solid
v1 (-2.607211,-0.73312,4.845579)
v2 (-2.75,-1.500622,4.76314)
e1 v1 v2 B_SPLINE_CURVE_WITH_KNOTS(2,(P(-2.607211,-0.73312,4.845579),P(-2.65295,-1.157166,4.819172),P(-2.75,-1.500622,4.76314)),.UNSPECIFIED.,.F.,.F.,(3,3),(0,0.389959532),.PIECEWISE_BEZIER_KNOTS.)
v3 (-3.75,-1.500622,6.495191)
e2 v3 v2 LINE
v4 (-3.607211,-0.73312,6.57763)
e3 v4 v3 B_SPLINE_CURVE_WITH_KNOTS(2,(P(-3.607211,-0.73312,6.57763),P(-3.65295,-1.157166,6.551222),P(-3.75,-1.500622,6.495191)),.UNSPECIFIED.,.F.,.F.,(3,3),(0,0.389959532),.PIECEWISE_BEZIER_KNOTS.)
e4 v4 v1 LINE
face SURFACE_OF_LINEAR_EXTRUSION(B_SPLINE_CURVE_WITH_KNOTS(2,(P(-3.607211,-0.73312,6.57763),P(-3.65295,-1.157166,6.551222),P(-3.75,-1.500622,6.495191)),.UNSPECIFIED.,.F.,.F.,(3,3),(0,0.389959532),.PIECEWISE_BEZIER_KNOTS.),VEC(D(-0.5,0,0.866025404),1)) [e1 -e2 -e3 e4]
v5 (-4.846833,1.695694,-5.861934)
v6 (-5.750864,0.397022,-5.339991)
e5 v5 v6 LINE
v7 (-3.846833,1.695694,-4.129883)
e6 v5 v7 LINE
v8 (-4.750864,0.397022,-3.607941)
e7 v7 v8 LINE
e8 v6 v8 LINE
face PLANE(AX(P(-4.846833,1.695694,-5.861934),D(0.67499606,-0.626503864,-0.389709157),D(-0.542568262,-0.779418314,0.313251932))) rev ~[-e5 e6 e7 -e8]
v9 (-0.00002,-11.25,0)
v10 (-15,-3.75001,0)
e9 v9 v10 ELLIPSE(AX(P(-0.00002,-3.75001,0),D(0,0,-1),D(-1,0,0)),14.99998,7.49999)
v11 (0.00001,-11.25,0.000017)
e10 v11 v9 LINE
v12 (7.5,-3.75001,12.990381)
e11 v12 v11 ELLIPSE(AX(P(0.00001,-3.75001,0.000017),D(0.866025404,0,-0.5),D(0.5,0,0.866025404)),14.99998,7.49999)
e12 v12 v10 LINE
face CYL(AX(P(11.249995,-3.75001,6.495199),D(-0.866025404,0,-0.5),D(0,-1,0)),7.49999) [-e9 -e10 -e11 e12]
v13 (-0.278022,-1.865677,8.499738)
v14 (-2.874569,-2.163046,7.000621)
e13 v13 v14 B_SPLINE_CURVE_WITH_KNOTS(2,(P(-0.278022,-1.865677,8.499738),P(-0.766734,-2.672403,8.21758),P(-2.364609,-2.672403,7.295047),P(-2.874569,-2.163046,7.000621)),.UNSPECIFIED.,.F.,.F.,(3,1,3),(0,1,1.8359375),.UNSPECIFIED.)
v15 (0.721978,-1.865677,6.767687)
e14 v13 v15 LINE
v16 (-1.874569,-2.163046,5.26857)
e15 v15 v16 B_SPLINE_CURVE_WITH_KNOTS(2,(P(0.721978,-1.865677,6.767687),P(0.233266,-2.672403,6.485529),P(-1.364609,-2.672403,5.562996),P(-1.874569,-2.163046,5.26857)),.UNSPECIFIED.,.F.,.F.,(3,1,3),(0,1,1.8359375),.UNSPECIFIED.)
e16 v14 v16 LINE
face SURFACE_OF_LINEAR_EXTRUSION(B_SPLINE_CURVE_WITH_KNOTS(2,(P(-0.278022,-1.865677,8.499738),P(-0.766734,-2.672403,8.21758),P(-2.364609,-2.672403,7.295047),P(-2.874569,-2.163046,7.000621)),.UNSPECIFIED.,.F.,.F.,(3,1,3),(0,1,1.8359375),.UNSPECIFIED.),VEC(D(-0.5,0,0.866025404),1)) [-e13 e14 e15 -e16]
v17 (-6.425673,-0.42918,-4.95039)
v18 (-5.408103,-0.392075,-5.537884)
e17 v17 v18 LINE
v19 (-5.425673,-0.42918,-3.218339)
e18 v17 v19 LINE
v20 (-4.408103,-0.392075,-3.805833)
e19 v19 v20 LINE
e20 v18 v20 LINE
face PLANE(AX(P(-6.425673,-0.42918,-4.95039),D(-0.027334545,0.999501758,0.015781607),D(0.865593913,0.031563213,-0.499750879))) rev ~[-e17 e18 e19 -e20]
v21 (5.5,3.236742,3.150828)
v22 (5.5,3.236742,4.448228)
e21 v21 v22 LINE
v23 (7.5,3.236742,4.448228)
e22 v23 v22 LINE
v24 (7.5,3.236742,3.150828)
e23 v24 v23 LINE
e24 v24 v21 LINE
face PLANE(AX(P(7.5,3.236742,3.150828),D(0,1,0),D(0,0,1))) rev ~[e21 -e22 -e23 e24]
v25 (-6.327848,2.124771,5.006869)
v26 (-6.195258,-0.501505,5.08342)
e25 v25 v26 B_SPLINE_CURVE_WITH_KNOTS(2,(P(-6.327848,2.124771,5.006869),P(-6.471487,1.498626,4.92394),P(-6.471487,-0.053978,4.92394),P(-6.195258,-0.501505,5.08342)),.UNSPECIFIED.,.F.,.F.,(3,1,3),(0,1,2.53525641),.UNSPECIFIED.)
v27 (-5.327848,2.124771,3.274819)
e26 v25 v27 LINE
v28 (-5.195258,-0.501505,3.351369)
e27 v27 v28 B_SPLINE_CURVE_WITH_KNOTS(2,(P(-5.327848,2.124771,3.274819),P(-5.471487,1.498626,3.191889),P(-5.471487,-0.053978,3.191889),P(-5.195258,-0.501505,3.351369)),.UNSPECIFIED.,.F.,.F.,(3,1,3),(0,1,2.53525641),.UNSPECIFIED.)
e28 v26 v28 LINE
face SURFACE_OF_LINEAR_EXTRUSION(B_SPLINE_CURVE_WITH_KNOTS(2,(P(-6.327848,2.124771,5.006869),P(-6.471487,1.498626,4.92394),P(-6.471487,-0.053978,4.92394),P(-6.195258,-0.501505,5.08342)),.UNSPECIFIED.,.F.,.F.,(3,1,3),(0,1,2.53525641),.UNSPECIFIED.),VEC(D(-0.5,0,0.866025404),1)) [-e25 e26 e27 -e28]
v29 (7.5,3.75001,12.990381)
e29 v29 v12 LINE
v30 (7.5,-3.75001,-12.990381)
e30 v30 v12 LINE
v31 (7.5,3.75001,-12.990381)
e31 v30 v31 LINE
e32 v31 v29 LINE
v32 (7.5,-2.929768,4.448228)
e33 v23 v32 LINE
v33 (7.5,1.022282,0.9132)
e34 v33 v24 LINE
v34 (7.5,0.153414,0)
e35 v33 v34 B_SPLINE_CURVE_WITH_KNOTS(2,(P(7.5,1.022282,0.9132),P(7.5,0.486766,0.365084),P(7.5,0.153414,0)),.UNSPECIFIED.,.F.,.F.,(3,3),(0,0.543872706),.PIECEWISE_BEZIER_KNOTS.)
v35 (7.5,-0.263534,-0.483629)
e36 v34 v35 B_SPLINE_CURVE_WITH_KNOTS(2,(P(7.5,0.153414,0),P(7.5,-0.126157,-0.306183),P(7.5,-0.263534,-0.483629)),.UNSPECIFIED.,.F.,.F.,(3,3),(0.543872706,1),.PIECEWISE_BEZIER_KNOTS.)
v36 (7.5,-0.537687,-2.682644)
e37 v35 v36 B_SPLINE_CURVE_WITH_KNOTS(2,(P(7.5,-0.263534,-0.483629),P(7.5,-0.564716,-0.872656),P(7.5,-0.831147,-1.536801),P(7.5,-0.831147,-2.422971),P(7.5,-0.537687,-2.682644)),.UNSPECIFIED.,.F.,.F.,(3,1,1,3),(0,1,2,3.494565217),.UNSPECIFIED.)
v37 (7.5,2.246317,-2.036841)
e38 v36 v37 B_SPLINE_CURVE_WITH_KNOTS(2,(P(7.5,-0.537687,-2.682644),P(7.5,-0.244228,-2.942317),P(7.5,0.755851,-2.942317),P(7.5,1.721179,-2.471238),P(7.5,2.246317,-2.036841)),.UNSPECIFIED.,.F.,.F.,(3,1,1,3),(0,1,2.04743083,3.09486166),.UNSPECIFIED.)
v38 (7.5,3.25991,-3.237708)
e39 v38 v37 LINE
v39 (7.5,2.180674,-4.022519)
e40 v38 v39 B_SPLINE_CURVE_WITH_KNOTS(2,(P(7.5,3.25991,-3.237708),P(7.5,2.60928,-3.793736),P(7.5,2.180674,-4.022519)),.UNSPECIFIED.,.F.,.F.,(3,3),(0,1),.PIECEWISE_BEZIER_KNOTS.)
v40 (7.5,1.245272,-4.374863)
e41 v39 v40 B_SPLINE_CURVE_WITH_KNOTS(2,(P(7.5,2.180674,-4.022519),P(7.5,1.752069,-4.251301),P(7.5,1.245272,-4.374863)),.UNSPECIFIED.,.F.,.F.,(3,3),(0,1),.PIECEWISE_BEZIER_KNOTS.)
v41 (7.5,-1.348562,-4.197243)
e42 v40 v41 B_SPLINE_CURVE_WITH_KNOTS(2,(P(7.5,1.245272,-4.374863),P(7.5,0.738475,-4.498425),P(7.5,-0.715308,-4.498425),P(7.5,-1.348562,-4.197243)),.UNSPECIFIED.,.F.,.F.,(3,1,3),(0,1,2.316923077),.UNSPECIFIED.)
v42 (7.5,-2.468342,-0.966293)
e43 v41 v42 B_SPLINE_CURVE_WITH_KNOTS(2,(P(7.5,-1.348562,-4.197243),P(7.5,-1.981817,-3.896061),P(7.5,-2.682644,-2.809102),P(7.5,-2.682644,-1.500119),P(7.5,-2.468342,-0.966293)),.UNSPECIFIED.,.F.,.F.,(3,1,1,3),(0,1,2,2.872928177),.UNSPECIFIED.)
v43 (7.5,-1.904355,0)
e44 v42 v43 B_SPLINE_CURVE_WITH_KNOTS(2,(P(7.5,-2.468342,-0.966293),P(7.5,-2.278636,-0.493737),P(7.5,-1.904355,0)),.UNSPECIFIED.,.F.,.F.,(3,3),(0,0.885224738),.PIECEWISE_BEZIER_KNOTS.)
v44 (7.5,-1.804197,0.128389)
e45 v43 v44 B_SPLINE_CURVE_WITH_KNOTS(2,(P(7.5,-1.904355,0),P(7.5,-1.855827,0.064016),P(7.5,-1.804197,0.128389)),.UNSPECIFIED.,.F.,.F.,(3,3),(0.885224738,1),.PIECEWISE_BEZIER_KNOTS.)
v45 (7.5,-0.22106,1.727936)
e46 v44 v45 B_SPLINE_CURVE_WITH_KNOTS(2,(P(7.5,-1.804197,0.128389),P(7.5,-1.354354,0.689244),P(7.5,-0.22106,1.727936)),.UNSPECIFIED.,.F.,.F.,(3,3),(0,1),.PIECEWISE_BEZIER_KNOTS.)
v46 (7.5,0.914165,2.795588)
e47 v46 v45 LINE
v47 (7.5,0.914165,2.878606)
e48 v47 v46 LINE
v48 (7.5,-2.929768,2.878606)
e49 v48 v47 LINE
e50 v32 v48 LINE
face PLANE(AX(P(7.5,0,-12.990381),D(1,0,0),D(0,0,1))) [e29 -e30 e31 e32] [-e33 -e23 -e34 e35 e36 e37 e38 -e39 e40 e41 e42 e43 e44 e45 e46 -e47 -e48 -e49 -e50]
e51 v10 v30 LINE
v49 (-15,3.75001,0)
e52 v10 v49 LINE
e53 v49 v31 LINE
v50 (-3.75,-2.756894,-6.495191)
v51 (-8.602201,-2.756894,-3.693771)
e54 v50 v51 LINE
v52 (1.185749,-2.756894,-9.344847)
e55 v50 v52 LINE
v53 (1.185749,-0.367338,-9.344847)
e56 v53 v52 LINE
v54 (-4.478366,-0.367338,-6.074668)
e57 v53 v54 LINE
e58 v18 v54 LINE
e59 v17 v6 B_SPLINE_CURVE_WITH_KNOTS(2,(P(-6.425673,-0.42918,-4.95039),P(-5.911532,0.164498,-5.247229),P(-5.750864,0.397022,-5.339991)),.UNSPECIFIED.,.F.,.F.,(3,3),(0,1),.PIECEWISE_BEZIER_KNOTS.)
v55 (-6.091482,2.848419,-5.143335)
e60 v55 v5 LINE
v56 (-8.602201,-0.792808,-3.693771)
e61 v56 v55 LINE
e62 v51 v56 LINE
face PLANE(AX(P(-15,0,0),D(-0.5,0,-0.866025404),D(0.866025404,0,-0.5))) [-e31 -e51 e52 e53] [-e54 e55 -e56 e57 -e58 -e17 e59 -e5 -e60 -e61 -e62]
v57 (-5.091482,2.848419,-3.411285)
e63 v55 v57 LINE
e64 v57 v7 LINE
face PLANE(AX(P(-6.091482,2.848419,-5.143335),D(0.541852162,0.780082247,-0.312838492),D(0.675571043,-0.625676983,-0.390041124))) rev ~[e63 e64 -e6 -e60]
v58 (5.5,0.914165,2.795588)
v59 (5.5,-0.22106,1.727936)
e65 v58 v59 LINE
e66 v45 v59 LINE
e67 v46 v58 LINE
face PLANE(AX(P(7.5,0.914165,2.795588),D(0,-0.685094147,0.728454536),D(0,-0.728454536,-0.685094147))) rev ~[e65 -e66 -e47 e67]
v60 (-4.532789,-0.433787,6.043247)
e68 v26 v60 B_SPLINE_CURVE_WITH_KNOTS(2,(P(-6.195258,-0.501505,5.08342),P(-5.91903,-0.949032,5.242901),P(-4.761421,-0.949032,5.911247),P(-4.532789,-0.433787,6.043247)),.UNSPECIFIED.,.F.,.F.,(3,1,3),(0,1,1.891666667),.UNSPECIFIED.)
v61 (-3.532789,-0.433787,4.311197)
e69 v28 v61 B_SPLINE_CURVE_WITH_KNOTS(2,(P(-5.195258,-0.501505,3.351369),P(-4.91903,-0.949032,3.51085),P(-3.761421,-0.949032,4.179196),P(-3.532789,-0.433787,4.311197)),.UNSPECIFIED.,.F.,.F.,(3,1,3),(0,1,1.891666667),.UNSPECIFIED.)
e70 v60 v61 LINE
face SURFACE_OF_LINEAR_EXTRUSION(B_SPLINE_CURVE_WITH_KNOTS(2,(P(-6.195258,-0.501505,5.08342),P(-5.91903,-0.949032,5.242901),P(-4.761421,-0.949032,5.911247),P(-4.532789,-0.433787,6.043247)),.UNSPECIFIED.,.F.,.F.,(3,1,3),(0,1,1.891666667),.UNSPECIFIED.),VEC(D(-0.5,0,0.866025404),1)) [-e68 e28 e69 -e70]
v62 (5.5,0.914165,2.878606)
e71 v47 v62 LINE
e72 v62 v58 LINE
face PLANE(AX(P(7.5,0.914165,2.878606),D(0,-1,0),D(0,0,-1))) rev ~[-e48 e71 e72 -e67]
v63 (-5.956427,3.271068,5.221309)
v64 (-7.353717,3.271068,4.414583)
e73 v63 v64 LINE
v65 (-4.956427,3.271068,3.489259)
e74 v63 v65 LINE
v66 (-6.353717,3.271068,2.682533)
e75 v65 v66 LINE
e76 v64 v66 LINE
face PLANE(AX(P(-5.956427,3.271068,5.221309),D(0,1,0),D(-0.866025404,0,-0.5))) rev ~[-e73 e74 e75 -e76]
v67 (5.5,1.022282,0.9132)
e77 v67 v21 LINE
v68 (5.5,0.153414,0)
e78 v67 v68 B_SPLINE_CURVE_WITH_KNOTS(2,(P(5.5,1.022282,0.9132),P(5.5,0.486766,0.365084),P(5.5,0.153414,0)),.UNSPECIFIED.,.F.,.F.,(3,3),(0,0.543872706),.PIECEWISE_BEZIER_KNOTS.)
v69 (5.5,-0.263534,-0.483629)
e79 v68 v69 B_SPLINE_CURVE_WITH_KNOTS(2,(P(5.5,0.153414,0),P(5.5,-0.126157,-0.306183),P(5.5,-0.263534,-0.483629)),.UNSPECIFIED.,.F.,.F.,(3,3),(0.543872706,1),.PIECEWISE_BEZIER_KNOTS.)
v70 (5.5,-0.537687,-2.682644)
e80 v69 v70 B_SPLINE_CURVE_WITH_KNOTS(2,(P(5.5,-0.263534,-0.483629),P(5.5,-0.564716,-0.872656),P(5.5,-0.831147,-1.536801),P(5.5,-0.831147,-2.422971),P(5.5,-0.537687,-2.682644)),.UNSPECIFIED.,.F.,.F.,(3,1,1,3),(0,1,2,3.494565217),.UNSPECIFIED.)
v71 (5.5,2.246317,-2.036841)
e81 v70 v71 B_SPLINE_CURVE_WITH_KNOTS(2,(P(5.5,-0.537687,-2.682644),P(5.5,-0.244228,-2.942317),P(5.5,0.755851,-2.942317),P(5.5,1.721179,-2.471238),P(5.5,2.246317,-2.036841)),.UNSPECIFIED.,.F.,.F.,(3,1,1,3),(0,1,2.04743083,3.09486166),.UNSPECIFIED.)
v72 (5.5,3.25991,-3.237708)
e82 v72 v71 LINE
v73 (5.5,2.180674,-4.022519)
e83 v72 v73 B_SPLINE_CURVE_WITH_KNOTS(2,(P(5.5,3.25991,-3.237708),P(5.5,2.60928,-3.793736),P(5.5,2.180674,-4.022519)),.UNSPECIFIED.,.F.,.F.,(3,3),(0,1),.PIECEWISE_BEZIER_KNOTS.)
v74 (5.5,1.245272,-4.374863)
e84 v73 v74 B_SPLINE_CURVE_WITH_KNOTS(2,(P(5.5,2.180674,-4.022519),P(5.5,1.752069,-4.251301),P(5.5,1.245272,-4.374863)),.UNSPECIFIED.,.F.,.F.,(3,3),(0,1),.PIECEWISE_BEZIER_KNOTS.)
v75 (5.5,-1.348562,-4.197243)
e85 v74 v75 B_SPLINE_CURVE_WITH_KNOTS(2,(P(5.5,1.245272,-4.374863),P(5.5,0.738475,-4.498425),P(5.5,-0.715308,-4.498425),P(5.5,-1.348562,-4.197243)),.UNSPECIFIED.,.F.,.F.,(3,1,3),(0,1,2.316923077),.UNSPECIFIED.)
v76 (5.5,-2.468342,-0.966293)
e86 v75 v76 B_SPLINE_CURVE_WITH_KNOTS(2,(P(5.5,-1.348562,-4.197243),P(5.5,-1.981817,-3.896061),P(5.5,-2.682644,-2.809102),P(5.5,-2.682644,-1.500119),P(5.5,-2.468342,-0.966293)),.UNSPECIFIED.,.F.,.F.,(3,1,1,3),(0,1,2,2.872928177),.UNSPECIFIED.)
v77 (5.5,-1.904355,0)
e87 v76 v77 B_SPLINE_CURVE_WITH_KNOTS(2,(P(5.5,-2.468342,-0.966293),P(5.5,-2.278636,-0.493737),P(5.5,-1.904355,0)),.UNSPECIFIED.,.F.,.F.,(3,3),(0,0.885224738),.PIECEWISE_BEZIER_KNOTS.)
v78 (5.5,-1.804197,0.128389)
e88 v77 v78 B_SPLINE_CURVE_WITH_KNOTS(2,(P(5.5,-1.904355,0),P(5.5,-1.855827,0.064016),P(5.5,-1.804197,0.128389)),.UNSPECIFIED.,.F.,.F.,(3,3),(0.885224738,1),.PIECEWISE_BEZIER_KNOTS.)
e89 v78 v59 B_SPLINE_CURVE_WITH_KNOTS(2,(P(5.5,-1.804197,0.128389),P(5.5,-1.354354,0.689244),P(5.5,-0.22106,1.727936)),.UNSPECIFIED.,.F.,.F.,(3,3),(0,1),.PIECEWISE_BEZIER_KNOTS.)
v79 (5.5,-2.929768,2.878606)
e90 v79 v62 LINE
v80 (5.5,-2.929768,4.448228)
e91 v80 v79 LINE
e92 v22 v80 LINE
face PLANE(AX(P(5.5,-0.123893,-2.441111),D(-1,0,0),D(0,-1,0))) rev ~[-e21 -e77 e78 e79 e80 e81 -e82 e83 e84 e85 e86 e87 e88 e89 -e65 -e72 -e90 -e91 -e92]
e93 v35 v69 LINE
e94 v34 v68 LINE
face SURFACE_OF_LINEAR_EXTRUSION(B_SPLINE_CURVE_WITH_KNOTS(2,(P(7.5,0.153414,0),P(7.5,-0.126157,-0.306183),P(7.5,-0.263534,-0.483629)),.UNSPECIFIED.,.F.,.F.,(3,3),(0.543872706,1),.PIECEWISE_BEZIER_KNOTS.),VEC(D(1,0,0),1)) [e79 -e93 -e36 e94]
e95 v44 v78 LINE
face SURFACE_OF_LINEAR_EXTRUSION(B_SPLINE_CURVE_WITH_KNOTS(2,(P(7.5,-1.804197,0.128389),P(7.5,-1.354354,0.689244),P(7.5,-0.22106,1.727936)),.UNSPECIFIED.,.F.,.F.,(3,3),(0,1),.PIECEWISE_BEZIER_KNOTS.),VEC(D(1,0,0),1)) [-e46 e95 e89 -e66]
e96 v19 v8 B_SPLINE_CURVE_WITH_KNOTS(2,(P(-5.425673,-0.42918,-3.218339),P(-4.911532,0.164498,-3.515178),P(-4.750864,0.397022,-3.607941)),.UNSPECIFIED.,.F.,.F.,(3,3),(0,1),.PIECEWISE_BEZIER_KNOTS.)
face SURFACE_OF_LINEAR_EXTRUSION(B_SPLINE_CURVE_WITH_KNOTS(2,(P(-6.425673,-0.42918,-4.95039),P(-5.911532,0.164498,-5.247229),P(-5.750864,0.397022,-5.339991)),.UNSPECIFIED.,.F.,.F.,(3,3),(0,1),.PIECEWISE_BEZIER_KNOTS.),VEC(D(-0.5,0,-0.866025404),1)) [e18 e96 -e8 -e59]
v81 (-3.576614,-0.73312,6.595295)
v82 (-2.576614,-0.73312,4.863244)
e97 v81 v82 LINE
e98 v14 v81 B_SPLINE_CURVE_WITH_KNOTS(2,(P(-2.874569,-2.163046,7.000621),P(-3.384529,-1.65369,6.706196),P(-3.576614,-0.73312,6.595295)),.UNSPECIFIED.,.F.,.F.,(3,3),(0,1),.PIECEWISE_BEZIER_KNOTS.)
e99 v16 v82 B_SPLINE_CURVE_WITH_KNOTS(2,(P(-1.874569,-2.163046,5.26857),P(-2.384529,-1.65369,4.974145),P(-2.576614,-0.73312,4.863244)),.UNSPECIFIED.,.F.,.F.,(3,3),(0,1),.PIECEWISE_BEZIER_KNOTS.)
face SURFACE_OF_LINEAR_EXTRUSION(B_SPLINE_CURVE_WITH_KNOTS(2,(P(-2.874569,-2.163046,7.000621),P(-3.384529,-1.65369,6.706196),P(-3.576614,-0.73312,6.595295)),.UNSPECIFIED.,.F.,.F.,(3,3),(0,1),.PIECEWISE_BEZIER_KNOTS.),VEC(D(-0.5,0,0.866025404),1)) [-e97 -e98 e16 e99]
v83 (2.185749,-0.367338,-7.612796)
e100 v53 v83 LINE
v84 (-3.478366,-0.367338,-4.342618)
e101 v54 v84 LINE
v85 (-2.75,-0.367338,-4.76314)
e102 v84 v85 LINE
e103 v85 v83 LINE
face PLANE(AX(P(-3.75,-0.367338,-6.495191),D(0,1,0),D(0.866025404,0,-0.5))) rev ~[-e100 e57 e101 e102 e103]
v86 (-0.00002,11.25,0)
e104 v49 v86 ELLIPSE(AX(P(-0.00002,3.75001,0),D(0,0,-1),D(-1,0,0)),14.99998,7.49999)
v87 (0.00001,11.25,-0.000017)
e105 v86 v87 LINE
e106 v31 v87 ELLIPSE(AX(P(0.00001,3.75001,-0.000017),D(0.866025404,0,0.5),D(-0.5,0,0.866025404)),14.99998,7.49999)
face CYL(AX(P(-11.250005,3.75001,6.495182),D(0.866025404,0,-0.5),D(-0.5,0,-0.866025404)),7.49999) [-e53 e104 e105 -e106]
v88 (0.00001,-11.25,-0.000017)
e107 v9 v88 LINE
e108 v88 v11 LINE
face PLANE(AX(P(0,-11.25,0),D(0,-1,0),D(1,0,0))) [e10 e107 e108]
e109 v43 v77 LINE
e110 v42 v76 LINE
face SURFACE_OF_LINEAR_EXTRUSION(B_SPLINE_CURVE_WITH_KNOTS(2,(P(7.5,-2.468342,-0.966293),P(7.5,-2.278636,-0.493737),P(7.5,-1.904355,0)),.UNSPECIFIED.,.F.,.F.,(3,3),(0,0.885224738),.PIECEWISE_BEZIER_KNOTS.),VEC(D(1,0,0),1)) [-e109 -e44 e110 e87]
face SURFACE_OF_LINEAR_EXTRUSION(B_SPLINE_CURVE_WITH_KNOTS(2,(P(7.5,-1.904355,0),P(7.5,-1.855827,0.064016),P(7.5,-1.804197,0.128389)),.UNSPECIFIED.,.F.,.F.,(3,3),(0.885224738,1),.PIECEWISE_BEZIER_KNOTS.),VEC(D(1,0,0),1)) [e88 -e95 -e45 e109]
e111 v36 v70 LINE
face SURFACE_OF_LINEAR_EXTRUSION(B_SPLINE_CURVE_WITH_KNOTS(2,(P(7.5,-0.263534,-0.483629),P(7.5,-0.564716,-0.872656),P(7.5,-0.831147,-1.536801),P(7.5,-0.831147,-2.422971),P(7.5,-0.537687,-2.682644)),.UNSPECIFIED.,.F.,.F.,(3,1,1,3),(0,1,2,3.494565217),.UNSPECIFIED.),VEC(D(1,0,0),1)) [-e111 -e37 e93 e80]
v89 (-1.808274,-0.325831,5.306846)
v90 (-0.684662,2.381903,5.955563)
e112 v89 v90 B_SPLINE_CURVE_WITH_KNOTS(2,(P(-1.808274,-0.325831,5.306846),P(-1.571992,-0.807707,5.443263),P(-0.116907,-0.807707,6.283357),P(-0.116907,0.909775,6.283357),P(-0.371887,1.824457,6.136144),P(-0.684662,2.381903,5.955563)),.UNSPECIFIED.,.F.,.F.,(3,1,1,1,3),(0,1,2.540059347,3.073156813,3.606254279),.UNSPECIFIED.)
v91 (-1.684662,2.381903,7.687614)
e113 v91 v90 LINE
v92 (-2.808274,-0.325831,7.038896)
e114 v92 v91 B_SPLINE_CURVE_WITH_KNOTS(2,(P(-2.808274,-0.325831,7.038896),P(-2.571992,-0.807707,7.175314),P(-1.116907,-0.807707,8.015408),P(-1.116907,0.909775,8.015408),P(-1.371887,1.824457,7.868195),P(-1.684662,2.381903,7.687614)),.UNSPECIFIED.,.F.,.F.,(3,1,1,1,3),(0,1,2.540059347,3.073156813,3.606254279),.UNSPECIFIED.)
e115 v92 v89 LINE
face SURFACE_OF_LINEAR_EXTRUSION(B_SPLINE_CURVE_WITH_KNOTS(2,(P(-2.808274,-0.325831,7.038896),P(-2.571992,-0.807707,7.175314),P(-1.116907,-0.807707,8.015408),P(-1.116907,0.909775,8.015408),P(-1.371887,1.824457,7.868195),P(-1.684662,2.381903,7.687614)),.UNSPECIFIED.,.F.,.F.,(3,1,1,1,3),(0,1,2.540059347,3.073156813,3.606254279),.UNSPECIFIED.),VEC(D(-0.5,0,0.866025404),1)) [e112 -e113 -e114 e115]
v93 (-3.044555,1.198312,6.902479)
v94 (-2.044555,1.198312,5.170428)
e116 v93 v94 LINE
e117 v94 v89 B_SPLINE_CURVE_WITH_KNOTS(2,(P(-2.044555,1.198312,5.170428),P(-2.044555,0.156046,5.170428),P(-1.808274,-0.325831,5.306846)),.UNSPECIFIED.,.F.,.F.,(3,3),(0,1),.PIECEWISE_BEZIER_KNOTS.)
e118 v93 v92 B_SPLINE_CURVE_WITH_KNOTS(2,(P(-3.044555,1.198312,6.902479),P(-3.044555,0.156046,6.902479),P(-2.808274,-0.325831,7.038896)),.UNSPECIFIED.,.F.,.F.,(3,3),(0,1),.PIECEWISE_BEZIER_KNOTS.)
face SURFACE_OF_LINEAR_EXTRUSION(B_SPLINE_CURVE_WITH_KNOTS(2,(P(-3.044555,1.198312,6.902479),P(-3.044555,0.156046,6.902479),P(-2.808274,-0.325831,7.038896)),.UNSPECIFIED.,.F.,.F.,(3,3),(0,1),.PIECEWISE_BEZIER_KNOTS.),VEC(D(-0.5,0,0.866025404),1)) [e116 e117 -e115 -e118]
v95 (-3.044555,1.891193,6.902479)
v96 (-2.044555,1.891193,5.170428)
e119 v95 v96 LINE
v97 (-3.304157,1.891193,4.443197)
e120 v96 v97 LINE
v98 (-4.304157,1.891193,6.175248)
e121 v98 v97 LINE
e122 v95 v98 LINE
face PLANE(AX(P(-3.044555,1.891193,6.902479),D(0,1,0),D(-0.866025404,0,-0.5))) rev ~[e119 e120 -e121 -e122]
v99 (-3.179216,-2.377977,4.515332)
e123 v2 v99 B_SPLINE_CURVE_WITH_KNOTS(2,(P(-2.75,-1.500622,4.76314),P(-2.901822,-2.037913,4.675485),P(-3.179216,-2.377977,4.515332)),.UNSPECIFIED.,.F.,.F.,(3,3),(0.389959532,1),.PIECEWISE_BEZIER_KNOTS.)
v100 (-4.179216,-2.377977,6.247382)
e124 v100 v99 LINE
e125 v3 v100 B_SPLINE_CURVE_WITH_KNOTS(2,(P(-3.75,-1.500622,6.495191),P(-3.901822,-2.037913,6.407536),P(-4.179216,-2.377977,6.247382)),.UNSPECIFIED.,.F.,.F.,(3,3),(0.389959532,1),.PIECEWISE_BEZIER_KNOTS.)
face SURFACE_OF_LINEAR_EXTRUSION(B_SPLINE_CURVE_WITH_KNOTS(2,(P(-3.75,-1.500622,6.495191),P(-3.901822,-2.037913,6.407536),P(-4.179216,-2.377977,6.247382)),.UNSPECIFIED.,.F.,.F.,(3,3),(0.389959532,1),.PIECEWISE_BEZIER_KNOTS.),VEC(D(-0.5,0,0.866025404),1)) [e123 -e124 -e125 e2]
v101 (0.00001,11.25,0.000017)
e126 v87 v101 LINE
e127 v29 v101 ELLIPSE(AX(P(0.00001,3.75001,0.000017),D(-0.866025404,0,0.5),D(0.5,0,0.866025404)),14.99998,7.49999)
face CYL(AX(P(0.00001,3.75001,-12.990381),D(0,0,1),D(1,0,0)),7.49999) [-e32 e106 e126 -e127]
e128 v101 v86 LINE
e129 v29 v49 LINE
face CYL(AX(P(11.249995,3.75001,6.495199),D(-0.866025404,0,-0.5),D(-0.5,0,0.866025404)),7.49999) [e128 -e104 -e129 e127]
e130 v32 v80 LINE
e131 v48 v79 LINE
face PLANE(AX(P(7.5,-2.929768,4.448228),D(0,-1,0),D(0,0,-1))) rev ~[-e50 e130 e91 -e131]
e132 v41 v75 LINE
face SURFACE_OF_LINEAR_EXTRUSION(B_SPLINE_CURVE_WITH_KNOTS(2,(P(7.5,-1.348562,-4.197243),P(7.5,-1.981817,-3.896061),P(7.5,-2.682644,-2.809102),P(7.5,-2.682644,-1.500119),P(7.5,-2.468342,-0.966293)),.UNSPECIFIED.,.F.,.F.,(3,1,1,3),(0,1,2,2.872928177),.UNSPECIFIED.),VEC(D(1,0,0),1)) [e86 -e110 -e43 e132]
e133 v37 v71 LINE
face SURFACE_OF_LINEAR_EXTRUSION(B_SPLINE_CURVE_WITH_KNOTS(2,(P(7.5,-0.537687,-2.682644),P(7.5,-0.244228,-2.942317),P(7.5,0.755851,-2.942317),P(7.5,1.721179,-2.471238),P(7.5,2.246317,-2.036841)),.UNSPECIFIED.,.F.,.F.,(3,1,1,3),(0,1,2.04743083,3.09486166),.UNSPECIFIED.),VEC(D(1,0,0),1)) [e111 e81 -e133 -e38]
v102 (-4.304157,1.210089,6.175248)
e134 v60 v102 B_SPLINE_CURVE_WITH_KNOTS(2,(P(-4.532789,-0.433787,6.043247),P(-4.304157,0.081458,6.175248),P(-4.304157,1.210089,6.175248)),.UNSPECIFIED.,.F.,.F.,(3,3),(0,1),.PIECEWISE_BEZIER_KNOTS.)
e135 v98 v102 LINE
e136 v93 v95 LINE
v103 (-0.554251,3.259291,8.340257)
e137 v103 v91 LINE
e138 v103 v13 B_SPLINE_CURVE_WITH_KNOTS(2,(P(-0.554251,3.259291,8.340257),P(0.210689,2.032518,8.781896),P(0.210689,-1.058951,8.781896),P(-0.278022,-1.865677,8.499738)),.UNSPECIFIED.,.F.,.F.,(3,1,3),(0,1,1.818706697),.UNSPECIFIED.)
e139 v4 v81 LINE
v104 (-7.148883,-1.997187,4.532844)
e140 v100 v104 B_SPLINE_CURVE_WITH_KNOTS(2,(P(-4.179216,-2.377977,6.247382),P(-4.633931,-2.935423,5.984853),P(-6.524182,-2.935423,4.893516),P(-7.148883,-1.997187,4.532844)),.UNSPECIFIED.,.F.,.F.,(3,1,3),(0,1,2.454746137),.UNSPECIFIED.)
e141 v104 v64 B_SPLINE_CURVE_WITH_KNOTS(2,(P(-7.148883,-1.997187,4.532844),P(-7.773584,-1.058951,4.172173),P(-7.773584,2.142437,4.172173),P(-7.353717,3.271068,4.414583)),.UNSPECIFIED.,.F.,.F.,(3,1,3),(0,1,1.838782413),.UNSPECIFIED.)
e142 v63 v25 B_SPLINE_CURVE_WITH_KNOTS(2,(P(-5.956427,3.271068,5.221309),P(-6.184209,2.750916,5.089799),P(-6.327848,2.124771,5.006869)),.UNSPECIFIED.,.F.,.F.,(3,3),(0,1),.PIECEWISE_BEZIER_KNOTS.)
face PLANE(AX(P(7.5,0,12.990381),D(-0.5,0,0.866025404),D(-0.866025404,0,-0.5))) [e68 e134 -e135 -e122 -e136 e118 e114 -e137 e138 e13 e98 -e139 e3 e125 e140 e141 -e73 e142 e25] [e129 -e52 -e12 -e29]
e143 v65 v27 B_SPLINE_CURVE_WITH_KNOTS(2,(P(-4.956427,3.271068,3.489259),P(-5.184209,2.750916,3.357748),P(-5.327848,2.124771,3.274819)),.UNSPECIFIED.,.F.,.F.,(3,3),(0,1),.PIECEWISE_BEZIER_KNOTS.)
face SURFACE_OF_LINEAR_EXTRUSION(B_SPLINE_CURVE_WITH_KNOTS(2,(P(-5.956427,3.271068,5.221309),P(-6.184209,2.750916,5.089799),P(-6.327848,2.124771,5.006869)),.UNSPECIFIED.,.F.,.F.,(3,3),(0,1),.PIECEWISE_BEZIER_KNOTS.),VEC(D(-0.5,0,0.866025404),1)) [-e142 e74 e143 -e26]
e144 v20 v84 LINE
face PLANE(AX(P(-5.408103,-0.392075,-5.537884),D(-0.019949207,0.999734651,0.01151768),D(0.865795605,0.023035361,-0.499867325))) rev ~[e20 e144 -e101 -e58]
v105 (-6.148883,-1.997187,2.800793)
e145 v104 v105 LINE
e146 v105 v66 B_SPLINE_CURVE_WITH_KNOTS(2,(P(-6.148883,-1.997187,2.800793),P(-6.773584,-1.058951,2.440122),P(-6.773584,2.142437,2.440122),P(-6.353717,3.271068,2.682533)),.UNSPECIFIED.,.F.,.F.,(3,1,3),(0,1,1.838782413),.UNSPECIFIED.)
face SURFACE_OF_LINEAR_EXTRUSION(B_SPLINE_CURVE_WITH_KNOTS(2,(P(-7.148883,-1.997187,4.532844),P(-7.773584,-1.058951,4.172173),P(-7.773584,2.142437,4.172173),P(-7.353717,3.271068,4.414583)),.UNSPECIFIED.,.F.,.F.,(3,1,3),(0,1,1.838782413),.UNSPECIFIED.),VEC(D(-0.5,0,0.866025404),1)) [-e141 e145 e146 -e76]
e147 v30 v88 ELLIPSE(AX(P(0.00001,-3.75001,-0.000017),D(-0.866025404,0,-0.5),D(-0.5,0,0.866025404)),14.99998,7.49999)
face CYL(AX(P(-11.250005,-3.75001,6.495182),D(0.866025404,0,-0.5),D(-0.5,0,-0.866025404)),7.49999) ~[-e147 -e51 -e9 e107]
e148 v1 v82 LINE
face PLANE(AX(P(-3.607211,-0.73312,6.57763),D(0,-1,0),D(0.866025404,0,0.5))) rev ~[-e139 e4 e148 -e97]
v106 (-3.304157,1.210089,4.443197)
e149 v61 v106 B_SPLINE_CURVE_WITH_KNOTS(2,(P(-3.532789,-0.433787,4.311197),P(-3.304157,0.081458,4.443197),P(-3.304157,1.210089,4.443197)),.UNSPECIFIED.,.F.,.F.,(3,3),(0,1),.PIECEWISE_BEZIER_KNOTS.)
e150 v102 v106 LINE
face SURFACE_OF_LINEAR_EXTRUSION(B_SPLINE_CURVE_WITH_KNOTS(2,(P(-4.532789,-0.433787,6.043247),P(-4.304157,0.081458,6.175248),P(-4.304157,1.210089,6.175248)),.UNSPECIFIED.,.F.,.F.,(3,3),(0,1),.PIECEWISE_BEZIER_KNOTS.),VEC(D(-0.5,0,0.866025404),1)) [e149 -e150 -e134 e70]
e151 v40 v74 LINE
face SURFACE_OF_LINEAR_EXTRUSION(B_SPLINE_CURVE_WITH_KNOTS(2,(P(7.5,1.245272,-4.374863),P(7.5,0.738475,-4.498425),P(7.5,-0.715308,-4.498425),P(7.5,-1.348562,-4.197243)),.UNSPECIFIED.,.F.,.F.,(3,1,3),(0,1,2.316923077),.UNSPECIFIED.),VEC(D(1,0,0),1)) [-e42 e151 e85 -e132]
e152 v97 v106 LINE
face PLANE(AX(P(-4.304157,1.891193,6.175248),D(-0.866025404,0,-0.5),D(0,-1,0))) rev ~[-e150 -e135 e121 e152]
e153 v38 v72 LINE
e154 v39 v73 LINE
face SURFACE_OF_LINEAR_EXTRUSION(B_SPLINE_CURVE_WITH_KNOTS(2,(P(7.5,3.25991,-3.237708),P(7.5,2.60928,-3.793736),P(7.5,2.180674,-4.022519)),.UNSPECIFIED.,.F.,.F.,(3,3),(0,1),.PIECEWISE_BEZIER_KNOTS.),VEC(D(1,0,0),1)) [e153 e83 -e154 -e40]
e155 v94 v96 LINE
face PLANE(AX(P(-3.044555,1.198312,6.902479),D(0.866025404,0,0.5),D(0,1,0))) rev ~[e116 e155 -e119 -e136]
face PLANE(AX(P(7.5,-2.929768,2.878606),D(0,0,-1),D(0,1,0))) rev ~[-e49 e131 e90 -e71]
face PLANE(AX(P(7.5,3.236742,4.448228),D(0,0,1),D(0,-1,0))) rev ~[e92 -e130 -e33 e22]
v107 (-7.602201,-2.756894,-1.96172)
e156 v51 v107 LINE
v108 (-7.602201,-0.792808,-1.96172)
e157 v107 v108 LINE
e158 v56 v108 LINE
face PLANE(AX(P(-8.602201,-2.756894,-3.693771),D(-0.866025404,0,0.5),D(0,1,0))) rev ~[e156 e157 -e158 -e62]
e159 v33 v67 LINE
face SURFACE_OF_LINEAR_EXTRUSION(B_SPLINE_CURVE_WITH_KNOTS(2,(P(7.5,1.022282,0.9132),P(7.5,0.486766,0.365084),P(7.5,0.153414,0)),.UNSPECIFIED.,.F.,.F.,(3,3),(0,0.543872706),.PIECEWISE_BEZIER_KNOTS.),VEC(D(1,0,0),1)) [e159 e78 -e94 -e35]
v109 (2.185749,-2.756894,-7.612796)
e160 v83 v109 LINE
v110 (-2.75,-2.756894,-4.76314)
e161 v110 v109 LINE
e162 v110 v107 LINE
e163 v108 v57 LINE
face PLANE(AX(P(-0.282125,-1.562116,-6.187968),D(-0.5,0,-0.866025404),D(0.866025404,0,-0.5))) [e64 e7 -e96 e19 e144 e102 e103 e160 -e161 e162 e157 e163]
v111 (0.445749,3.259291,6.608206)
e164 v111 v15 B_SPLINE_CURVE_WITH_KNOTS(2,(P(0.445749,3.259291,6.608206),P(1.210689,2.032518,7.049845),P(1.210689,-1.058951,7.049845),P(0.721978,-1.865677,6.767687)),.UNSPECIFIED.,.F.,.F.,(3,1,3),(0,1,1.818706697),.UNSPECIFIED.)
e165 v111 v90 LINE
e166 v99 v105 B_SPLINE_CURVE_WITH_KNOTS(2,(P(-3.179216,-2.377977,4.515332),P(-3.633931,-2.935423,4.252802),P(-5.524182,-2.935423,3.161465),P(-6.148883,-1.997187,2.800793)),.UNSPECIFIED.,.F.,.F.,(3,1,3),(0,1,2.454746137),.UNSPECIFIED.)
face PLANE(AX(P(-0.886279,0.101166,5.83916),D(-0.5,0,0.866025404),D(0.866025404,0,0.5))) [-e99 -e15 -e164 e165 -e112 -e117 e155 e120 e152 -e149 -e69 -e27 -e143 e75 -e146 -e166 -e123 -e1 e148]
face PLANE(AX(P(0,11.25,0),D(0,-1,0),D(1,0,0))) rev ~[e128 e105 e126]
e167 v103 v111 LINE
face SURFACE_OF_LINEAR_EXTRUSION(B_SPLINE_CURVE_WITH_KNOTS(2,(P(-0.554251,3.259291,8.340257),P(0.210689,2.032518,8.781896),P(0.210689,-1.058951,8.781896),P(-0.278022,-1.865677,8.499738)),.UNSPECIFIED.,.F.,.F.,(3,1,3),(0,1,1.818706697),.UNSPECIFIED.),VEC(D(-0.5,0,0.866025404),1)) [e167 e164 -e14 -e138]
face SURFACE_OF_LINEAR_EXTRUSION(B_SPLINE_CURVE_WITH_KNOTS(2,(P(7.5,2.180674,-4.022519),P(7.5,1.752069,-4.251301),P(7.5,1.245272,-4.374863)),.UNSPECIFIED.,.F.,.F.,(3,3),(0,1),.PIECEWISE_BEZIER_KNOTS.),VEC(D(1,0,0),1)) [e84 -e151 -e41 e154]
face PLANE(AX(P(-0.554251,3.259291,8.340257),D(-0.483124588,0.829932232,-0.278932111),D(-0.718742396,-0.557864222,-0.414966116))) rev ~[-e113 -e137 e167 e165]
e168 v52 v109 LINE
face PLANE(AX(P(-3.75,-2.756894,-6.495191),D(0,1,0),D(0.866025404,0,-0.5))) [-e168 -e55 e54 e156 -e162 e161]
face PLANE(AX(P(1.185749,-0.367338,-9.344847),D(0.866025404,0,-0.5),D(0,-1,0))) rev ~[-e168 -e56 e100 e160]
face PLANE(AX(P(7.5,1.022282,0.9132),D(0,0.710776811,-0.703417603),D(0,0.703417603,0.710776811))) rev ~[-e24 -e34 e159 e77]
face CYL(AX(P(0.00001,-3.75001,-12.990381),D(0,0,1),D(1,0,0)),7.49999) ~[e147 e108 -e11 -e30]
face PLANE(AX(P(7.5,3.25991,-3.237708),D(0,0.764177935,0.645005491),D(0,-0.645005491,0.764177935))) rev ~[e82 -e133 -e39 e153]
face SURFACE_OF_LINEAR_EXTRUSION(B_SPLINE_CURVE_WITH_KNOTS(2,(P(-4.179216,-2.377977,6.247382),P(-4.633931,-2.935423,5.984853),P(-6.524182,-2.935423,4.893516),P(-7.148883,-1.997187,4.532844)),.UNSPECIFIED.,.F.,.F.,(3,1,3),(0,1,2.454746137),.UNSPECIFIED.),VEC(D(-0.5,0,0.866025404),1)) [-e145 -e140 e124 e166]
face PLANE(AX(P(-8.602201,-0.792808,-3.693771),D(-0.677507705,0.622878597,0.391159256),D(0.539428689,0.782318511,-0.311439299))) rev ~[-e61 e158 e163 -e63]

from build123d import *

# Parameters (mm, degrees)
F1_DEPTH      = 11.25
F1_DEPTH_BACK = 11.25
F2_R          = 7.49999
F3_W          = 5.6993120345
F3_H          = 2.3895553061
F6_DEPTH      = 2
F7_DEPTH      = 2
F8_DEPTH      = 2


# Not quite as in the source:
# - a fillet or chamfer is up to 0.001 mm smaller than in the source, because OpenCascade refuses the exact size


with BuildPart() as f1:
    # F0 (on Front) → F1 (new body, two sides)
    with BuildSketch(Plane.XZ) as f1_sk:
        Polygon((7.5, -12.9903810568), (7.5, 12.9903810568), (-15, 0), align=None)
    extrude(amount=F1_DEPTH)
    extrude(f1_sk.sketch, amount=-F1_DEPTH_BACK)

    # F2 (radius 7.5 in the source; OpenCascade refuses exactly that, so slightly less here)
    f2_edges = [f1.edges().sort_by_distance(p)[0] for p in [
        (7.5, 11.25, 0),
        (-3.75, 11.25, 6.495191),
        (-3.75, 11.25, -6.495191),
        (7.5, -11.25, 0),
        (-3.75, -11.25, 6.495191),
        (-3.75, -11.25, -6.495191),
    ]]
    fillet(f2_edges, radius=F2_R)

    # F3 (on face) → F6 (cut)
    with BuildSketch(Plane(origin=(-3.75, 0, -6.4951905284), x_dir=(0.8660254038, 0, -0.5), z_dir=(-0.5, 0, -0.8660254038))):
        with Locations((2.8496560172, 1.562116124)):
            Rectangle(F3_W, F3_H)
        with BuildLine():
            Line((-0.8410443106, 0.367338471), (0, 0.367338471))
            Line((0, 0.367338471), (0, 2.7568937771))
            Line((0, 2.7568937771), (-5.6028393047, 2.7568937771))
            Line((-5.6028393047, 2.7568937771), (-5.6028393047, 0.7928079458))
            Line((-5.6028393047, 0.7928079458), (-2.7037100927, -2.8484191874))
            Line((-2.7037100927, -2.8484191874), (-1.2665137854, -1.6956937498))
            Line((-1.2665137854, -1.6956937498), (-2.3103981945, -0.3970223878))
            add(Edge.make_bspline(
                [(-3.0896010117, 0.4291799644), (-2.4959226748, -0.1644983725), (-2.3103981945, -0.3970223878)],
                knots=[0, 0, 0, 1, 1, 1], degree=2))
            Line((-3.0896010117, 0.4291799644), (-1.9146126366, 0.3920750683))
            Line((-1.9146126366, 0.3920750683), (-0.8410443106, 0.367338471))
        make_face()
    extrude(amount=-F6_DEPTH, mode=Mode.SUBTRACT)

    # F4 (on face) → F7 (cut)
    with BuildSketch(Plane.YZ.offset(7.5)):
        with BuildLine():
            add(Edge.make_bspline(
                [(0.1534139825, 0), (-0.1261569639, -0.3061831776), (-0.2635343428, -0.4836289588)],
                knots=[0.5438727063, 0.5438727063, 0.5438727063, 1, 1, 1], degree=2))
            Line((0.1534139825, 0), (-1.9043553856, 0))
            add(Edge.make_bspline(
                [(-2.4683418116, -0.9662925903), (-2.2786358022, -0.49373663), (-1.9043553856, 0)],
                knots=[0, 0, 0, 0.8852247383, 0.8852247383, 0.8852247383], degree=2))
            add(Edge.make_bspline(
                [(-2.682644464, -2.110205397), (-2.682644464, -1.5001185668), (-2.4683418116, -0.9662925903)],
                knots=[0, 0, 0, 1, 1, 1], degree=2))
            add(Edge.make_bspline(
                [(-2.3322306675, -3.3525815846), (-2.682644464, -2.8091023355), (-2.682644464, -2.110205397)],
                knots=[0, 0, 0, 1, 1, 1], degree=2))
            add(Edge.make_bspline(
                [(-1.3485621865, -4.1972429397), (-1.981816871, -3.8960608337), (-2.3322306675, -3.3525815846)],
                knots=[0, 0, 0, 1, 1, 1], degree=2))
            add(Edge.make_bspline(
                [(0.1110126353, -4.4984250458), (-0.7153075019, -4.4984250458), (-1.3485621865, -4.1972429397)],
                knots=[0, 0, 0, 1, 1, 1], degree=2))
            add(Edge.make_bspline(
                [(1.2452721693, -4.3748631562), (0.7384753562, -4.4984250458), (0.1110126353, -4.4984250458)],
                knots=[0, 0, 0, 1, 1, 1], degree=2))
            add(Edge.make_bspline(
                [(2.1806742872, -4.0225187051), (1.7520689824, -4.2513012665), (1.2452721693, -4.3748631562)],
                knots=[0, 0, 0, 1, 1, 1], degree=2))
            add(Edge.make_bspline(
                [(3.2599101673, -3.2377076403), (2.609279592, -3.7937361438), (2.1806742872, -4.0225187051)],
                knots=[0, 0, 0, 1, 1, 1], degree=2))
            Line((3.2599101673, -3.2377076403), (2.2463165411, -2.036840525))
            add(Edge.make_bspline(
                [(1.2385148785, -2.7067776456), (1.72117851, -2.4712377934), (2.2463165411, -2.036840525)],
                knots=[0, 0, 0, 1, 1, 1], degree=2))
            add(Edge.make_bspline(
                [(0.2442277976, -2.9423174978), (0.755851247, -2.9423174978), (1.2385148785, -2.7067776456)],
                knots=[0, 0, 0, 1, 1, 1], degree=2))
            add(Edge.make_bspline(
                [(-0.5376872855, -2.682644464), (-0.2442277976, -2.9423174978), (0.2442277976, -2.9423174978)],
                knots=[0, 0, 0, 1, 1, 1], degree=2))
            add(Edge.make_bspline(
                [(-0.8311467735, -1.8920414356), (-0.8311467735, -2.4229714303), (-0.5376872855, -2.682644464)],
                knots=[0, 0, 0, 1, 1, 1], degree=2))
            add(Edge.make_bspline(
                [(-0.6979316112, -1.2047284243), (-0.8311467735, -1.5368010028), (-0.8311467735, -1.8920414356)],
                knots=[0, 0, 0, 1, 1, 1], degree=2))
            add(Edge.make_bspline(
                [(-0.2635343428, -0.4836289588), (-0.5647164489, -0.8726558458), (-0.6979316112, -1.2047284243)],
                knots=[0, 0, 0, 1, 1, 1], degree=2))
        make_face()
        with BuildLine():
            Line((-1.9043553856, 0), (0.1534139825, 0))
            add(Edge.make_bspline(
                [(1.0222815716, 0.9131995908), (0.4867661175, 0.3650837732), (0.1534139825, 0)],
                knots=[0, 0, 0, 0.5438727063, 0.5438727063, 0.5438727063], degree=2))
            Line((1.0222815716, 0.9131995908), (3.236742313, 3.1508281866))
            Line((3.236742313, 3.1508281866), (3.236742313, 4.4482280281))
            Line((3.236742313, 4.4482280281), (-2.9297682434, 4.4482280281))
            Line((-2.9297682434, 4.4482280281), (-2.9297682434, 2.8786058984))
            Line((-2.9297682434, 2.8786058984), (0.9141649181, 2.8786058984))
            Line((0.9141649181, 2.8786058984), (0.9141649181, 2.7955877538))
            Line((0.9141649181, 2.7955877538), (-0.2210599432, 1.7279358009))
            add(Edge.make_bspline(
                [(-1.8041966546, 0.128388526), (-1.3543541501, 0.6892436658), (-0.2210599432, 1.7279358009)],
                knots=[0, 0, 0, 1, 1, 1], degree=2))
            add(Edge.make_bspline(
                [(-1.9043553856, 0), (-1.8558274458, 0.0640162305), (-1.8041966546, 0.128388526)],
                knots=[0.8852247383, 0.8852247383, 0.8852247383, 1, 1, 1], degree=2))
        make_face()
    extrude(amount=-F7_DEPTH, mode=Mode.SUBTRACT)

    # F5 (on face) → F8 (cut)
    with BuildSketch(Plane(origin=(-3.75, 0, 6.4951905284), x_dir=(0.8660254038, 0, 0.5), z_dir=(-0.5, 0, 0.8660254038))):
        with BuildLine():
            Line((0.8145773358, 1.8911934049), (0, 1.8911934049))
            Line((0, 1.8911934049), (0, 0))
            Line((0, 0), (0, -1.5006215977))
            add(Edge.make_bspline(
                [(0.1648783041, -0.7331196022), (0.1120638425, -1.1571661487), (0, -1.5006215977)],
                knots=[0, 0, 0, 0.3899595317, 0.3899595317, 0.3899595317], degree=2))
            Line((0.1648783041, -0.7331196022), (0.2002093693, -0.7331196022))
            add(Edge.make_bspline(
                [(1.0108610311, -2.163046323), (0.422009945, -1.6536901335), (0.2002093693, -0.7331196022)],
                knots=[0, 0, 0, 1, 1, 1], degree=2))
            add(Edge.make_bspline(
                [(2.4398063334, -2.6724025124), (1.5997121172, -2.6724025124), (1.0108610311, -2.163046323)],
                knots=[0, 0, 0, 1, 1, 1], degree=2))
            add(Edge.make_bspline(
                [(4.0090944779, -1.8656765245), (3.4447788537, -2.6724025124), (2.4398063334, -2.6724025124)],
                knots=[0, 0, 0, 1, 1, 1], degree=2))
            add(Edge.make_bspline(
                [(4.5734101021, 0.3327008636), (4.5734101021, -1.0589505365), (4.0090944779, -1.8656765245)],
                knots=[0, 0, 0, 1, 1, 1], degree=2))
            add(Edge.make_bspline(
                [(3.6901334729, 3.2592907616), (4.5734101021, 2.0325176655), (4.5734101021, 0.3327008636)],
                knots=[0, 0, 0, 1, 1, 1], degree=2))
            Line((3.6901334729, 3.2592907616), (2.3848468987, 2.3819026433))
            add(Edge.make_bspline(
                [(2.8932216697, 1.3671159382), (2.7460088982, 1.8244569484), (2.3848468987, 2.3819026433)],
                knots=[0, 0, 0, 1, 1, 1], degree=2))
            add(Edge.make_bspline(
                [(3.0404344412, 0.4681366135), (3.0404344412, 0.909774928), (2.8932216697, 1.3671159382)],
                knots=[0, 0, 0, 1, 1, 1], degree=2))
            add(Edge.make_bspline(
                [(2.0217220623, -0.8077074064), (3.0404344412, -0.8077074064), (3.0404344412, 0.4681366135)],
                knots=[0, 0, 0, 1, 1, 1], degree=2))
            add(Edge.make_bspline(
                [(1.0874116723, -0.3258309343), (1.3602460089, -0.8077074064), (2.0217220623, -0.8077074064)],
                knots=[0, 0, 0, 1, 1, 1], degree=2))
            add(Edge.make_bspline(
                [(0.8145773358, 1.1983119602), (0.8145773358, 0.1560455378), (1.0874116723, -0.3258309343)],
                knots=[0, 0, 0, 1, 1, 1], degree=2))
            Line((0.8145773358, 1.1983119602), (0.8145773358, 1.8911934049))
        make_face()
        with BuildLine():
            Line((0, 0), (0, 1.8911934049))
            Line((0, 1.8911934049), (-0.6398848469, 1.8911934049))
            Line((-0.6398848469, 1.8911934049), (-0.6398848469, 1.2100889819))
            add(Edge.make_bspline(
                [(-0.9038864172, -0.4337869668), (-0.6398848469, 0.0814577336), (-0.6398848469, 1.2100889819)],
                knots=[0, 0, 0, 1, 1, 1], degree=2))
            add(Edge.make_bspline(
                [(-1.7979586496, -0.9490316671), (-1.1678879874, -0.9490316671), (-0.9038864172, -0.4337869668)],
                knots=[0, 0, 0, 1, 1, 1], degree=2))
            add(Edge.make_bspline(
                [(-2.8235409579, -0.5015048417), (-2.5045799529, -0.9490316671), (-1.7979586496, -0.9490316671)],
                knots=[0, 0, 0, 1, 1, 1], degree=2))
            add(Edge.make_bspline(
                [(-3.1425019628, 0.8862208846), (-3.1425019628, -0.0539780162), (-2.8235409579, -0.5015048417)],
                knots=[0, 0, 0, 1, 1, 1], degree=2))
            add(Edge.make_bspline(
                [(-2.9766422403, 2.1247710024), (-3.1425019628, 1.4986260141), (-3.1425019628, 0.8862208846)],
                knots=[0, 0, 0, 1, 1, 1], degree=2))
            add(Edge.make_bspline(
                [(-2.5477623659, 3.2710677833), (-2.8107825177, 2.7509159906), (-2.9766422403, 2.1247710024)],
                knots=[0, 0, 0, 1, 1, 1], degree=2))
            Line((-2.5477623659, 3.2710677833), (-4.1612143418, 3.2710677833))
            add(Edge.make_bspline(
                [(-4.6460350694, 0.6820858414), (-4.6460350694, 2.1424365349), (-4.1612143418, 3.2710677833)],
                knots=[0, 0, 0, 1, 1, 1], degree=2))
            add(Edge.make_bspline(
                [(-3.9246924889, -1.9971866004), (-4.6460350694, -1.0589505365), (-4.6460350694, 0.6820858414)],
                knots=[0, 0, 0, 1, 1, 1], degree=2))
            add(Edge.make_bspline(
                [(-1.9098403559, -2.9354226642), (-3.2033499084, -2.9354226642), (-3.9246924889, -1.9971866004)],
                knots=[0, 0, 0, 1, 1, 1], degree=2))
            add(Edge.make_bspline(
                [(-0.4956163308, -2.3779769694), (-1.0206752159, -2.9354226642), (-1.9098403559, -2.9354226642)],
                knots=[0, 0, 0, 1, 1, 1], degree=2))
            add(Edge.make_bspline(
                [(0, -1.5006215977), (-0.1753091627, -2.0379125367), (-0.4956163308, -2.3779769694)],
                knots=[0.3899595317, 0.3899595317, 0.3899595317, 1, 1, 1], degree=2))
            Line((0, -1.5006215977), (0, 0))
        make_face()
    extrude(amount=-F8_DEPTH, mode=Mode.SUBTRACT)


solid = f1.part
